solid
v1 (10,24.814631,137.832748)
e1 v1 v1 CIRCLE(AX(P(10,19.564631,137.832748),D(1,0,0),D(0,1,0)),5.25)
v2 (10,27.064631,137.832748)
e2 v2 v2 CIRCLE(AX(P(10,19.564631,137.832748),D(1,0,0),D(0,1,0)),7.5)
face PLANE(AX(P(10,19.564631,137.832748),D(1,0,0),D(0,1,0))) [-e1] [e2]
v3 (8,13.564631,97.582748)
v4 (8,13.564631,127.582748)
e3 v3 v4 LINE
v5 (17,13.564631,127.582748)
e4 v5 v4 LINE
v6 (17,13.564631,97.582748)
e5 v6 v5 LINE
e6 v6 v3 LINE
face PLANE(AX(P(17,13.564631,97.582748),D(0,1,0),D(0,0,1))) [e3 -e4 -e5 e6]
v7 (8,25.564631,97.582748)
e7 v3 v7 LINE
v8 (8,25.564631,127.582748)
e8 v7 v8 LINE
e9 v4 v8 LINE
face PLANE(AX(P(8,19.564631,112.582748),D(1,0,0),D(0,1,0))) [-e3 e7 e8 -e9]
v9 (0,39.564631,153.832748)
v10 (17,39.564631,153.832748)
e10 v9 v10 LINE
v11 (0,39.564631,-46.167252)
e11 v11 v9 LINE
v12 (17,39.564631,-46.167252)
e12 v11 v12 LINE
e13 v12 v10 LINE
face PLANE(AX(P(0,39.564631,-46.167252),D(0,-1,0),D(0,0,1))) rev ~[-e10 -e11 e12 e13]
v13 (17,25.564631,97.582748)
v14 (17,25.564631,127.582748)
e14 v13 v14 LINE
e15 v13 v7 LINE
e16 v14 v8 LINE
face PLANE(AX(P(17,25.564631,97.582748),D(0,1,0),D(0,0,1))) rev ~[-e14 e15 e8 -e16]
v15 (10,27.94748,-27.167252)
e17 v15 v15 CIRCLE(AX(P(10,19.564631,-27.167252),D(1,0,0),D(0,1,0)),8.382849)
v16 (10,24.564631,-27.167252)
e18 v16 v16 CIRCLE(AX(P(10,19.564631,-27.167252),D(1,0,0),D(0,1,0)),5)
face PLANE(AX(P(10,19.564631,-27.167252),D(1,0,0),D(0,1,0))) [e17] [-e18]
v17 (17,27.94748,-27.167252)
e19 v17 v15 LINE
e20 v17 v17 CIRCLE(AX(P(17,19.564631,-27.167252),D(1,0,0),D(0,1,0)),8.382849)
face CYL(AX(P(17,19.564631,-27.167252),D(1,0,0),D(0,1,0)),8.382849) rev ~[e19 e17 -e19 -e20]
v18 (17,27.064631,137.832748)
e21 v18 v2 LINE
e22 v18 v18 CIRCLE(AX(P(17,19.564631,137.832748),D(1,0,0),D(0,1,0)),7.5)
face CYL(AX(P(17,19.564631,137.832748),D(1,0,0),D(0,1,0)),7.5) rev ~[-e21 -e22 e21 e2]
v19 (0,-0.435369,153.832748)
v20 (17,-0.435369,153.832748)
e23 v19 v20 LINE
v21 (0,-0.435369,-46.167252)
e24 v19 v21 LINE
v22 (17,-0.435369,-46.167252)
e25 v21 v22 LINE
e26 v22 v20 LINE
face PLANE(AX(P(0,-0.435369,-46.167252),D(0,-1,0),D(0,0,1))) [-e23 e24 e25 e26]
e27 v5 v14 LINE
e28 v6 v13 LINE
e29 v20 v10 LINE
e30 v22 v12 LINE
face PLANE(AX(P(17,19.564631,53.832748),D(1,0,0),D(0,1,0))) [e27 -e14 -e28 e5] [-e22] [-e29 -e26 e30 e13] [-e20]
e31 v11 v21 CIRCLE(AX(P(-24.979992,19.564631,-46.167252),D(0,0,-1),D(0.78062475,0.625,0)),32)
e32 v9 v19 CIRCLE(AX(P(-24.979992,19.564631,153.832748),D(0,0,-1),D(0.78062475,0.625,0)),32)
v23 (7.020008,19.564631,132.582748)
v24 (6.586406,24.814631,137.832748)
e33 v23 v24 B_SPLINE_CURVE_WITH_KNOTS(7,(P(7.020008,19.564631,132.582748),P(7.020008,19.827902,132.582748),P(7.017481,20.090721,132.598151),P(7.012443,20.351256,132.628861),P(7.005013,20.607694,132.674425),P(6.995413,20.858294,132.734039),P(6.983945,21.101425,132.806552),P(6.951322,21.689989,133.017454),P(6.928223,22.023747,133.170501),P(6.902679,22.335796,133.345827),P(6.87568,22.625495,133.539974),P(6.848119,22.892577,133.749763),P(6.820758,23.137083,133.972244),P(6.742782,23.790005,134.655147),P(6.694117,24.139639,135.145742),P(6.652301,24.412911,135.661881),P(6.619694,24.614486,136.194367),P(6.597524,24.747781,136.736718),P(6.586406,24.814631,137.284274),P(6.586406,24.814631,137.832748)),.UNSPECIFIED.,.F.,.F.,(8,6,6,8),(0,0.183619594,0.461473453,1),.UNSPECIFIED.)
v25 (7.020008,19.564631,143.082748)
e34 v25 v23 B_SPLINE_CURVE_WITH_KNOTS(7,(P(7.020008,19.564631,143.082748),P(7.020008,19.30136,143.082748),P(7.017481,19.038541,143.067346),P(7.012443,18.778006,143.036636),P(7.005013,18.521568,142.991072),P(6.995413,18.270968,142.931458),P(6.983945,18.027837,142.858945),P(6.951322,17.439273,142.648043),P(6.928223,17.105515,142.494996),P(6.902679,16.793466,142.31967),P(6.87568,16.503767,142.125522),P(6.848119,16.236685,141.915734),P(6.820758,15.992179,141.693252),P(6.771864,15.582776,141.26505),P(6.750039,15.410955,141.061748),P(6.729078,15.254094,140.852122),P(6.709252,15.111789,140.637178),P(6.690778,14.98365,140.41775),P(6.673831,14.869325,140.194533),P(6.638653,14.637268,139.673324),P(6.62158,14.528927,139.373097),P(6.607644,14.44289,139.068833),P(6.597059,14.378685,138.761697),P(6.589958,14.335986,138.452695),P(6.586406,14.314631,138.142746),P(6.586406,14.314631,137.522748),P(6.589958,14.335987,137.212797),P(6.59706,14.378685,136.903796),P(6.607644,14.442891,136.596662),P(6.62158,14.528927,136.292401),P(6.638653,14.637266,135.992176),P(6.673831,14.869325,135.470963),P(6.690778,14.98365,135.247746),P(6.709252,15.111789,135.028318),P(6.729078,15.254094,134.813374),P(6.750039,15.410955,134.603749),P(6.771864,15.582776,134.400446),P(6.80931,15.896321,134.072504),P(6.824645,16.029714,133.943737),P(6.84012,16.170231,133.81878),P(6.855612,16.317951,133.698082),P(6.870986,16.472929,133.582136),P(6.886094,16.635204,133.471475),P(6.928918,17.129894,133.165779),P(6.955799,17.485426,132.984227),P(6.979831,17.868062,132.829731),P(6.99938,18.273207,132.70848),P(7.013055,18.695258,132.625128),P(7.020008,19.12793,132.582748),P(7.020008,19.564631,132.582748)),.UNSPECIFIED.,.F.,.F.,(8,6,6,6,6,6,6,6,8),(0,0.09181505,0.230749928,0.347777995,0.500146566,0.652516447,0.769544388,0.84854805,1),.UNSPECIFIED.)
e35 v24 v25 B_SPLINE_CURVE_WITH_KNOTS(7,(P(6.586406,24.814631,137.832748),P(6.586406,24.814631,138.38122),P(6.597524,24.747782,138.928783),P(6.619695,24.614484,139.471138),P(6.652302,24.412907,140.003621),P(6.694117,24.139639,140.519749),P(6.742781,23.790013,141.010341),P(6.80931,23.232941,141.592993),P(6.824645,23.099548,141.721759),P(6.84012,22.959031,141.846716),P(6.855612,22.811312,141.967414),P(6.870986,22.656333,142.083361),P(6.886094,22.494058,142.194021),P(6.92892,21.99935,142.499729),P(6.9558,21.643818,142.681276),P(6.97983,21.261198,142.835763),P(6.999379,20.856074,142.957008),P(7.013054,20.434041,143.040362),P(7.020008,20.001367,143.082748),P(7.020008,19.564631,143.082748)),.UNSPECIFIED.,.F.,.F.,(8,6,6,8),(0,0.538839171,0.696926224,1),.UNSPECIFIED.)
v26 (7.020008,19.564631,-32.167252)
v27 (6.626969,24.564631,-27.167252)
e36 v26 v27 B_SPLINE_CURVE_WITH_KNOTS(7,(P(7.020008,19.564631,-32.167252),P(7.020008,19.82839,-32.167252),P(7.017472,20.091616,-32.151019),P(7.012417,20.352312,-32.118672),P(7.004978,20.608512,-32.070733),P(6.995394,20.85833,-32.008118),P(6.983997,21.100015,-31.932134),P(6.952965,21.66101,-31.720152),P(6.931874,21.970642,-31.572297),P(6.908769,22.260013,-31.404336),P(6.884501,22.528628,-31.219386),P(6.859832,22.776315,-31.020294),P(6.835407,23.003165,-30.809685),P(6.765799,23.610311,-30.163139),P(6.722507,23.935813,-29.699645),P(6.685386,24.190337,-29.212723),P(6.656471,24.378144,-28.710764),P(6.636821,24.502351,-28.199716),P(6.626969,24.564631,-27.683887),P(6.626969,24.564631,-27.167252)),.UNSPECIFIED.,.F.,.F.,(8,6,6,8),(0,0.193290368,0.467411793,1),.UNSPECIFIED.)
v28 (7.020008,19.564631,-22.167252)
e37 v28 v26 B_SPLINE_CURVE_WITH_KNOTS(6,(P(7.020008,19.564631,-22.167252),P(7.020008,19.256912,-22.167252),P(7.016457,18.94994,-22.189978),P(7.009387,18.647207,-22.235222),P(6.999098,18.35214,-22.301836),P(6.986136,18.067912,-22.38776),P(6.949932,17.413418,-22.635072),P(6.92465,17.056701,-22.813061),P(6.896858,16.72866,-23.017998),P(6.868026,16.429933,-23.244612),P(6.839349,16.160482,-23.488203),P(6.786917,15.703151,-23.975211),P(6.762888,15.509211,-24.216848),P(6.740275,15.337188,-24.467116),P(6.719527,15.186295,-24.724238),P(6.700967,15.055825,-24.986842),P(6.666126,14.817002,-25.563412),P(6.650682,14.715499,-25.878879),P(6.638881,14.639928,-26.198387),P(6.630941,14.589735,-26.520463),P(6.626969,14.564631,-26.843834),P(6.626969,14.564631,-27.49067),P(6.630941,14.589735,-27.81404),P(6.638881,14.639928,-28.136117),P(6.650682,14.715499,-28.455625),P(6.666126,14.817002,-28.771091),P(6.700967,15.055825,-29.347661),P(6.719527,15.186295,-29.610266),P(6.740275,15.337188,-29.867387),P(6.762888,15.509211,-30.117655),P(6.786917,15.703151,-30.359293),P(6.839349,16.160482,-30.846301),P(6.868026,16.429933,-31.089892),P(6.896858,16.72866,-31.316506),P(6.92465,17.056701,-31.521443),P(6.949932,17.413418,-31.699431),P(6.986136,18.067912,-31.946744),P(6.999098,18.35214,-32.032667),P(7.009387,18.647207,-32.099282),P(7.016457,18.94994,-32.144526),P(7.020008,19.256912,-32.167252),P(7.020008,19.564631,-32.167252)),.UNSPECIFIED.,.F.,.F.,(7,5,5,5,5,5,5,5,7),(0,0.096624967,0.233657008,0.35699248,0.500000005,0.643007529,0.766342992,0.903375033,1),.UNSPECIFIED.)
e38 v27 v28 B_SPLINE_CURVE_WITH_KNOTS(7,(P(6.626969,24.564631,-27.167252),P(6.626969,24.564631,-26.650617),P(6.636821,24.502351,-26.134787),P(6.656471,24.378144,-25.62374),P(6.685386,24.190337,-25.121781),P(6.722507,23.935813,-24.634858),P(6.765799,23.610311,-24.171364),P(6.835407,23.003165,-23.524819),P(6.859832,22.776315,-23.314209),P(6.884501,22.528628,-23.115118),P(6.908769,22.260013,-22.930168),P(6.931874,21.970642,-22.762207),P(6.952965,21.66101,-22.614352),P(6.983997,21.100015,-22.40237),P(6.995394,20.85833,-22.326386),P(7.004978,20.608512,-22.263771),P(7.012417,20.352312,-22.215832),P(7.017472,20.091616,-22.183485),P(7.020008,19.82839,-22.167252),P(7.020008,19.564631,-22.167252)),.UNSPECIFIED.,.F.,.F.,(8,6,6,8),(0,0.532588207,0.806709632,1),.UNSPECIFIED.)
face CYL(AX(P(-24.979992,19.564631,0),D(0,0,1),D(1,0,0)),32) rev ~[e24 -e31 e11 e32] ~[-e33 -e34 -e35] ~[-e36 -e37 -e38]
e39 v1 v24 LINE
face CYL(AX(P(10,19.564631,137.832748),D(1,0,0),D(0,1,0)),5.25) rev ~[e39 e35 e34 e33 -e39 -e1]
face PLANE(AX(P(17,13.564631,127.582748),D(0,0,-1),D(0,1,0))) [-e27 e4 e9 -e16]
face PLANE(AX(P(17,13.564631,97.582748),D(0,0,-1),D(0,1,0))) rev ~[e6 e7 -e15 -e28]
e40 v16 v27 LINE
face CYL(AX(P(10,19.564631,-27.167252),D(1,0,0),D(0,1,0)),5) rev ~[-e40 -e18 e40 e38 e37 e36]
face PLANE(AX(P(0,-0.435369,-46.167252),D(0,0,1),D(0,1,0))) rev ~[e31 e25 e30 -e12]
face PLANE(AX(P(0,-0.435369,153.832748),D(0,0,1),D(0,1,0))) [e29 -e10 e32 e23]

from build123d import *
from build123d import SkipClean  # not in build123d's __all__

# Parameters (mm, degrees)
F0_W      = 40
F0_H      = 200
F1_DEPTH  = 17
F2_R      = 32
F3_DEPTH  = 187
F4_DEPTH  = 195
F5_R      = 8.3828490824
F5_R_2    = 7.5
F6_DEPTH  = 7
F7_R      = 5
F7_R_2    = 5.25
F8_DEPTH  = 25
F9_W      = 12
F9_H      = 30
F10_DEPTH = 9


with BuildPart() as f1:
    # F0 (on Right) → F1 (new body)
    with BuildSketch(Plane.YZ):
        with Locations((19.5646310411, 53.8327481339)):
            Rectangle(F0_W, F0_H)
    extrude(amount=F1_DEPTH)

    # F2 (on Top) → F3 (cut, symmetric)
    with BuildSketch(Plane.XY):
        with Locations((-24.9799919936, 19.5646310411)):
            Circle(F2_R)
    extrude(amount=F3_DEPTH, both=True, mode=Mode.SUBTRACT)

    # F2 (on Top) → F4 (cut)
    with BuildSketch(Plane.XY):
        with Locations((-24.9799919936, 19.5646310411)):
            Circle(F2_R)
    extrude(amount=-F4_DEPTH, mode=Mode.SUBTRACT)

    # F5 (on face) → F6 (cut)
    with BuildSketch(Plane.YZ.offset(17)):
        with Locations((19.5646310411, -27.1672518661)):
            Circle(F5_R)
        with Locations((19.5646310411, 137.8327481339)):
            Circle(F5_R_2)
    extrude(amount=-F6_DEPTH, mode=Mode.SUBTRACT)

    # F7 (on face) → F8 (cut)
    with BuildSketch(Plane.YZ.offset(10)):
        with Locations((19.5646310411, -27.1672518661)):
            Circle(F7_R)
        with Locations((19.5646310411, 137.8327481339)):
            Circle(F7_R_2)
    with SkipClean():  # cleaning this boolean's faces spoils the solid; the shape is the same uncleaned
        extrude(amount=-F8_DEPTH, mode=Mode.SUBTRACT)

    # F9 (on face) → F10 (cut)
    with BuildSketch(Plane.YZ.offset(17)):
        with Locations((19.5646310411, 112.5827481339)):
            Rectangle(F9_W, F9_H)
    with SkipClean():  # cleaning this boolean's faces spoils the solid; the shape is the same uncleaned
        extrude(amount=-F10_DEPTH, mode=Mode.SUBTRACT)


solid = f1.part
